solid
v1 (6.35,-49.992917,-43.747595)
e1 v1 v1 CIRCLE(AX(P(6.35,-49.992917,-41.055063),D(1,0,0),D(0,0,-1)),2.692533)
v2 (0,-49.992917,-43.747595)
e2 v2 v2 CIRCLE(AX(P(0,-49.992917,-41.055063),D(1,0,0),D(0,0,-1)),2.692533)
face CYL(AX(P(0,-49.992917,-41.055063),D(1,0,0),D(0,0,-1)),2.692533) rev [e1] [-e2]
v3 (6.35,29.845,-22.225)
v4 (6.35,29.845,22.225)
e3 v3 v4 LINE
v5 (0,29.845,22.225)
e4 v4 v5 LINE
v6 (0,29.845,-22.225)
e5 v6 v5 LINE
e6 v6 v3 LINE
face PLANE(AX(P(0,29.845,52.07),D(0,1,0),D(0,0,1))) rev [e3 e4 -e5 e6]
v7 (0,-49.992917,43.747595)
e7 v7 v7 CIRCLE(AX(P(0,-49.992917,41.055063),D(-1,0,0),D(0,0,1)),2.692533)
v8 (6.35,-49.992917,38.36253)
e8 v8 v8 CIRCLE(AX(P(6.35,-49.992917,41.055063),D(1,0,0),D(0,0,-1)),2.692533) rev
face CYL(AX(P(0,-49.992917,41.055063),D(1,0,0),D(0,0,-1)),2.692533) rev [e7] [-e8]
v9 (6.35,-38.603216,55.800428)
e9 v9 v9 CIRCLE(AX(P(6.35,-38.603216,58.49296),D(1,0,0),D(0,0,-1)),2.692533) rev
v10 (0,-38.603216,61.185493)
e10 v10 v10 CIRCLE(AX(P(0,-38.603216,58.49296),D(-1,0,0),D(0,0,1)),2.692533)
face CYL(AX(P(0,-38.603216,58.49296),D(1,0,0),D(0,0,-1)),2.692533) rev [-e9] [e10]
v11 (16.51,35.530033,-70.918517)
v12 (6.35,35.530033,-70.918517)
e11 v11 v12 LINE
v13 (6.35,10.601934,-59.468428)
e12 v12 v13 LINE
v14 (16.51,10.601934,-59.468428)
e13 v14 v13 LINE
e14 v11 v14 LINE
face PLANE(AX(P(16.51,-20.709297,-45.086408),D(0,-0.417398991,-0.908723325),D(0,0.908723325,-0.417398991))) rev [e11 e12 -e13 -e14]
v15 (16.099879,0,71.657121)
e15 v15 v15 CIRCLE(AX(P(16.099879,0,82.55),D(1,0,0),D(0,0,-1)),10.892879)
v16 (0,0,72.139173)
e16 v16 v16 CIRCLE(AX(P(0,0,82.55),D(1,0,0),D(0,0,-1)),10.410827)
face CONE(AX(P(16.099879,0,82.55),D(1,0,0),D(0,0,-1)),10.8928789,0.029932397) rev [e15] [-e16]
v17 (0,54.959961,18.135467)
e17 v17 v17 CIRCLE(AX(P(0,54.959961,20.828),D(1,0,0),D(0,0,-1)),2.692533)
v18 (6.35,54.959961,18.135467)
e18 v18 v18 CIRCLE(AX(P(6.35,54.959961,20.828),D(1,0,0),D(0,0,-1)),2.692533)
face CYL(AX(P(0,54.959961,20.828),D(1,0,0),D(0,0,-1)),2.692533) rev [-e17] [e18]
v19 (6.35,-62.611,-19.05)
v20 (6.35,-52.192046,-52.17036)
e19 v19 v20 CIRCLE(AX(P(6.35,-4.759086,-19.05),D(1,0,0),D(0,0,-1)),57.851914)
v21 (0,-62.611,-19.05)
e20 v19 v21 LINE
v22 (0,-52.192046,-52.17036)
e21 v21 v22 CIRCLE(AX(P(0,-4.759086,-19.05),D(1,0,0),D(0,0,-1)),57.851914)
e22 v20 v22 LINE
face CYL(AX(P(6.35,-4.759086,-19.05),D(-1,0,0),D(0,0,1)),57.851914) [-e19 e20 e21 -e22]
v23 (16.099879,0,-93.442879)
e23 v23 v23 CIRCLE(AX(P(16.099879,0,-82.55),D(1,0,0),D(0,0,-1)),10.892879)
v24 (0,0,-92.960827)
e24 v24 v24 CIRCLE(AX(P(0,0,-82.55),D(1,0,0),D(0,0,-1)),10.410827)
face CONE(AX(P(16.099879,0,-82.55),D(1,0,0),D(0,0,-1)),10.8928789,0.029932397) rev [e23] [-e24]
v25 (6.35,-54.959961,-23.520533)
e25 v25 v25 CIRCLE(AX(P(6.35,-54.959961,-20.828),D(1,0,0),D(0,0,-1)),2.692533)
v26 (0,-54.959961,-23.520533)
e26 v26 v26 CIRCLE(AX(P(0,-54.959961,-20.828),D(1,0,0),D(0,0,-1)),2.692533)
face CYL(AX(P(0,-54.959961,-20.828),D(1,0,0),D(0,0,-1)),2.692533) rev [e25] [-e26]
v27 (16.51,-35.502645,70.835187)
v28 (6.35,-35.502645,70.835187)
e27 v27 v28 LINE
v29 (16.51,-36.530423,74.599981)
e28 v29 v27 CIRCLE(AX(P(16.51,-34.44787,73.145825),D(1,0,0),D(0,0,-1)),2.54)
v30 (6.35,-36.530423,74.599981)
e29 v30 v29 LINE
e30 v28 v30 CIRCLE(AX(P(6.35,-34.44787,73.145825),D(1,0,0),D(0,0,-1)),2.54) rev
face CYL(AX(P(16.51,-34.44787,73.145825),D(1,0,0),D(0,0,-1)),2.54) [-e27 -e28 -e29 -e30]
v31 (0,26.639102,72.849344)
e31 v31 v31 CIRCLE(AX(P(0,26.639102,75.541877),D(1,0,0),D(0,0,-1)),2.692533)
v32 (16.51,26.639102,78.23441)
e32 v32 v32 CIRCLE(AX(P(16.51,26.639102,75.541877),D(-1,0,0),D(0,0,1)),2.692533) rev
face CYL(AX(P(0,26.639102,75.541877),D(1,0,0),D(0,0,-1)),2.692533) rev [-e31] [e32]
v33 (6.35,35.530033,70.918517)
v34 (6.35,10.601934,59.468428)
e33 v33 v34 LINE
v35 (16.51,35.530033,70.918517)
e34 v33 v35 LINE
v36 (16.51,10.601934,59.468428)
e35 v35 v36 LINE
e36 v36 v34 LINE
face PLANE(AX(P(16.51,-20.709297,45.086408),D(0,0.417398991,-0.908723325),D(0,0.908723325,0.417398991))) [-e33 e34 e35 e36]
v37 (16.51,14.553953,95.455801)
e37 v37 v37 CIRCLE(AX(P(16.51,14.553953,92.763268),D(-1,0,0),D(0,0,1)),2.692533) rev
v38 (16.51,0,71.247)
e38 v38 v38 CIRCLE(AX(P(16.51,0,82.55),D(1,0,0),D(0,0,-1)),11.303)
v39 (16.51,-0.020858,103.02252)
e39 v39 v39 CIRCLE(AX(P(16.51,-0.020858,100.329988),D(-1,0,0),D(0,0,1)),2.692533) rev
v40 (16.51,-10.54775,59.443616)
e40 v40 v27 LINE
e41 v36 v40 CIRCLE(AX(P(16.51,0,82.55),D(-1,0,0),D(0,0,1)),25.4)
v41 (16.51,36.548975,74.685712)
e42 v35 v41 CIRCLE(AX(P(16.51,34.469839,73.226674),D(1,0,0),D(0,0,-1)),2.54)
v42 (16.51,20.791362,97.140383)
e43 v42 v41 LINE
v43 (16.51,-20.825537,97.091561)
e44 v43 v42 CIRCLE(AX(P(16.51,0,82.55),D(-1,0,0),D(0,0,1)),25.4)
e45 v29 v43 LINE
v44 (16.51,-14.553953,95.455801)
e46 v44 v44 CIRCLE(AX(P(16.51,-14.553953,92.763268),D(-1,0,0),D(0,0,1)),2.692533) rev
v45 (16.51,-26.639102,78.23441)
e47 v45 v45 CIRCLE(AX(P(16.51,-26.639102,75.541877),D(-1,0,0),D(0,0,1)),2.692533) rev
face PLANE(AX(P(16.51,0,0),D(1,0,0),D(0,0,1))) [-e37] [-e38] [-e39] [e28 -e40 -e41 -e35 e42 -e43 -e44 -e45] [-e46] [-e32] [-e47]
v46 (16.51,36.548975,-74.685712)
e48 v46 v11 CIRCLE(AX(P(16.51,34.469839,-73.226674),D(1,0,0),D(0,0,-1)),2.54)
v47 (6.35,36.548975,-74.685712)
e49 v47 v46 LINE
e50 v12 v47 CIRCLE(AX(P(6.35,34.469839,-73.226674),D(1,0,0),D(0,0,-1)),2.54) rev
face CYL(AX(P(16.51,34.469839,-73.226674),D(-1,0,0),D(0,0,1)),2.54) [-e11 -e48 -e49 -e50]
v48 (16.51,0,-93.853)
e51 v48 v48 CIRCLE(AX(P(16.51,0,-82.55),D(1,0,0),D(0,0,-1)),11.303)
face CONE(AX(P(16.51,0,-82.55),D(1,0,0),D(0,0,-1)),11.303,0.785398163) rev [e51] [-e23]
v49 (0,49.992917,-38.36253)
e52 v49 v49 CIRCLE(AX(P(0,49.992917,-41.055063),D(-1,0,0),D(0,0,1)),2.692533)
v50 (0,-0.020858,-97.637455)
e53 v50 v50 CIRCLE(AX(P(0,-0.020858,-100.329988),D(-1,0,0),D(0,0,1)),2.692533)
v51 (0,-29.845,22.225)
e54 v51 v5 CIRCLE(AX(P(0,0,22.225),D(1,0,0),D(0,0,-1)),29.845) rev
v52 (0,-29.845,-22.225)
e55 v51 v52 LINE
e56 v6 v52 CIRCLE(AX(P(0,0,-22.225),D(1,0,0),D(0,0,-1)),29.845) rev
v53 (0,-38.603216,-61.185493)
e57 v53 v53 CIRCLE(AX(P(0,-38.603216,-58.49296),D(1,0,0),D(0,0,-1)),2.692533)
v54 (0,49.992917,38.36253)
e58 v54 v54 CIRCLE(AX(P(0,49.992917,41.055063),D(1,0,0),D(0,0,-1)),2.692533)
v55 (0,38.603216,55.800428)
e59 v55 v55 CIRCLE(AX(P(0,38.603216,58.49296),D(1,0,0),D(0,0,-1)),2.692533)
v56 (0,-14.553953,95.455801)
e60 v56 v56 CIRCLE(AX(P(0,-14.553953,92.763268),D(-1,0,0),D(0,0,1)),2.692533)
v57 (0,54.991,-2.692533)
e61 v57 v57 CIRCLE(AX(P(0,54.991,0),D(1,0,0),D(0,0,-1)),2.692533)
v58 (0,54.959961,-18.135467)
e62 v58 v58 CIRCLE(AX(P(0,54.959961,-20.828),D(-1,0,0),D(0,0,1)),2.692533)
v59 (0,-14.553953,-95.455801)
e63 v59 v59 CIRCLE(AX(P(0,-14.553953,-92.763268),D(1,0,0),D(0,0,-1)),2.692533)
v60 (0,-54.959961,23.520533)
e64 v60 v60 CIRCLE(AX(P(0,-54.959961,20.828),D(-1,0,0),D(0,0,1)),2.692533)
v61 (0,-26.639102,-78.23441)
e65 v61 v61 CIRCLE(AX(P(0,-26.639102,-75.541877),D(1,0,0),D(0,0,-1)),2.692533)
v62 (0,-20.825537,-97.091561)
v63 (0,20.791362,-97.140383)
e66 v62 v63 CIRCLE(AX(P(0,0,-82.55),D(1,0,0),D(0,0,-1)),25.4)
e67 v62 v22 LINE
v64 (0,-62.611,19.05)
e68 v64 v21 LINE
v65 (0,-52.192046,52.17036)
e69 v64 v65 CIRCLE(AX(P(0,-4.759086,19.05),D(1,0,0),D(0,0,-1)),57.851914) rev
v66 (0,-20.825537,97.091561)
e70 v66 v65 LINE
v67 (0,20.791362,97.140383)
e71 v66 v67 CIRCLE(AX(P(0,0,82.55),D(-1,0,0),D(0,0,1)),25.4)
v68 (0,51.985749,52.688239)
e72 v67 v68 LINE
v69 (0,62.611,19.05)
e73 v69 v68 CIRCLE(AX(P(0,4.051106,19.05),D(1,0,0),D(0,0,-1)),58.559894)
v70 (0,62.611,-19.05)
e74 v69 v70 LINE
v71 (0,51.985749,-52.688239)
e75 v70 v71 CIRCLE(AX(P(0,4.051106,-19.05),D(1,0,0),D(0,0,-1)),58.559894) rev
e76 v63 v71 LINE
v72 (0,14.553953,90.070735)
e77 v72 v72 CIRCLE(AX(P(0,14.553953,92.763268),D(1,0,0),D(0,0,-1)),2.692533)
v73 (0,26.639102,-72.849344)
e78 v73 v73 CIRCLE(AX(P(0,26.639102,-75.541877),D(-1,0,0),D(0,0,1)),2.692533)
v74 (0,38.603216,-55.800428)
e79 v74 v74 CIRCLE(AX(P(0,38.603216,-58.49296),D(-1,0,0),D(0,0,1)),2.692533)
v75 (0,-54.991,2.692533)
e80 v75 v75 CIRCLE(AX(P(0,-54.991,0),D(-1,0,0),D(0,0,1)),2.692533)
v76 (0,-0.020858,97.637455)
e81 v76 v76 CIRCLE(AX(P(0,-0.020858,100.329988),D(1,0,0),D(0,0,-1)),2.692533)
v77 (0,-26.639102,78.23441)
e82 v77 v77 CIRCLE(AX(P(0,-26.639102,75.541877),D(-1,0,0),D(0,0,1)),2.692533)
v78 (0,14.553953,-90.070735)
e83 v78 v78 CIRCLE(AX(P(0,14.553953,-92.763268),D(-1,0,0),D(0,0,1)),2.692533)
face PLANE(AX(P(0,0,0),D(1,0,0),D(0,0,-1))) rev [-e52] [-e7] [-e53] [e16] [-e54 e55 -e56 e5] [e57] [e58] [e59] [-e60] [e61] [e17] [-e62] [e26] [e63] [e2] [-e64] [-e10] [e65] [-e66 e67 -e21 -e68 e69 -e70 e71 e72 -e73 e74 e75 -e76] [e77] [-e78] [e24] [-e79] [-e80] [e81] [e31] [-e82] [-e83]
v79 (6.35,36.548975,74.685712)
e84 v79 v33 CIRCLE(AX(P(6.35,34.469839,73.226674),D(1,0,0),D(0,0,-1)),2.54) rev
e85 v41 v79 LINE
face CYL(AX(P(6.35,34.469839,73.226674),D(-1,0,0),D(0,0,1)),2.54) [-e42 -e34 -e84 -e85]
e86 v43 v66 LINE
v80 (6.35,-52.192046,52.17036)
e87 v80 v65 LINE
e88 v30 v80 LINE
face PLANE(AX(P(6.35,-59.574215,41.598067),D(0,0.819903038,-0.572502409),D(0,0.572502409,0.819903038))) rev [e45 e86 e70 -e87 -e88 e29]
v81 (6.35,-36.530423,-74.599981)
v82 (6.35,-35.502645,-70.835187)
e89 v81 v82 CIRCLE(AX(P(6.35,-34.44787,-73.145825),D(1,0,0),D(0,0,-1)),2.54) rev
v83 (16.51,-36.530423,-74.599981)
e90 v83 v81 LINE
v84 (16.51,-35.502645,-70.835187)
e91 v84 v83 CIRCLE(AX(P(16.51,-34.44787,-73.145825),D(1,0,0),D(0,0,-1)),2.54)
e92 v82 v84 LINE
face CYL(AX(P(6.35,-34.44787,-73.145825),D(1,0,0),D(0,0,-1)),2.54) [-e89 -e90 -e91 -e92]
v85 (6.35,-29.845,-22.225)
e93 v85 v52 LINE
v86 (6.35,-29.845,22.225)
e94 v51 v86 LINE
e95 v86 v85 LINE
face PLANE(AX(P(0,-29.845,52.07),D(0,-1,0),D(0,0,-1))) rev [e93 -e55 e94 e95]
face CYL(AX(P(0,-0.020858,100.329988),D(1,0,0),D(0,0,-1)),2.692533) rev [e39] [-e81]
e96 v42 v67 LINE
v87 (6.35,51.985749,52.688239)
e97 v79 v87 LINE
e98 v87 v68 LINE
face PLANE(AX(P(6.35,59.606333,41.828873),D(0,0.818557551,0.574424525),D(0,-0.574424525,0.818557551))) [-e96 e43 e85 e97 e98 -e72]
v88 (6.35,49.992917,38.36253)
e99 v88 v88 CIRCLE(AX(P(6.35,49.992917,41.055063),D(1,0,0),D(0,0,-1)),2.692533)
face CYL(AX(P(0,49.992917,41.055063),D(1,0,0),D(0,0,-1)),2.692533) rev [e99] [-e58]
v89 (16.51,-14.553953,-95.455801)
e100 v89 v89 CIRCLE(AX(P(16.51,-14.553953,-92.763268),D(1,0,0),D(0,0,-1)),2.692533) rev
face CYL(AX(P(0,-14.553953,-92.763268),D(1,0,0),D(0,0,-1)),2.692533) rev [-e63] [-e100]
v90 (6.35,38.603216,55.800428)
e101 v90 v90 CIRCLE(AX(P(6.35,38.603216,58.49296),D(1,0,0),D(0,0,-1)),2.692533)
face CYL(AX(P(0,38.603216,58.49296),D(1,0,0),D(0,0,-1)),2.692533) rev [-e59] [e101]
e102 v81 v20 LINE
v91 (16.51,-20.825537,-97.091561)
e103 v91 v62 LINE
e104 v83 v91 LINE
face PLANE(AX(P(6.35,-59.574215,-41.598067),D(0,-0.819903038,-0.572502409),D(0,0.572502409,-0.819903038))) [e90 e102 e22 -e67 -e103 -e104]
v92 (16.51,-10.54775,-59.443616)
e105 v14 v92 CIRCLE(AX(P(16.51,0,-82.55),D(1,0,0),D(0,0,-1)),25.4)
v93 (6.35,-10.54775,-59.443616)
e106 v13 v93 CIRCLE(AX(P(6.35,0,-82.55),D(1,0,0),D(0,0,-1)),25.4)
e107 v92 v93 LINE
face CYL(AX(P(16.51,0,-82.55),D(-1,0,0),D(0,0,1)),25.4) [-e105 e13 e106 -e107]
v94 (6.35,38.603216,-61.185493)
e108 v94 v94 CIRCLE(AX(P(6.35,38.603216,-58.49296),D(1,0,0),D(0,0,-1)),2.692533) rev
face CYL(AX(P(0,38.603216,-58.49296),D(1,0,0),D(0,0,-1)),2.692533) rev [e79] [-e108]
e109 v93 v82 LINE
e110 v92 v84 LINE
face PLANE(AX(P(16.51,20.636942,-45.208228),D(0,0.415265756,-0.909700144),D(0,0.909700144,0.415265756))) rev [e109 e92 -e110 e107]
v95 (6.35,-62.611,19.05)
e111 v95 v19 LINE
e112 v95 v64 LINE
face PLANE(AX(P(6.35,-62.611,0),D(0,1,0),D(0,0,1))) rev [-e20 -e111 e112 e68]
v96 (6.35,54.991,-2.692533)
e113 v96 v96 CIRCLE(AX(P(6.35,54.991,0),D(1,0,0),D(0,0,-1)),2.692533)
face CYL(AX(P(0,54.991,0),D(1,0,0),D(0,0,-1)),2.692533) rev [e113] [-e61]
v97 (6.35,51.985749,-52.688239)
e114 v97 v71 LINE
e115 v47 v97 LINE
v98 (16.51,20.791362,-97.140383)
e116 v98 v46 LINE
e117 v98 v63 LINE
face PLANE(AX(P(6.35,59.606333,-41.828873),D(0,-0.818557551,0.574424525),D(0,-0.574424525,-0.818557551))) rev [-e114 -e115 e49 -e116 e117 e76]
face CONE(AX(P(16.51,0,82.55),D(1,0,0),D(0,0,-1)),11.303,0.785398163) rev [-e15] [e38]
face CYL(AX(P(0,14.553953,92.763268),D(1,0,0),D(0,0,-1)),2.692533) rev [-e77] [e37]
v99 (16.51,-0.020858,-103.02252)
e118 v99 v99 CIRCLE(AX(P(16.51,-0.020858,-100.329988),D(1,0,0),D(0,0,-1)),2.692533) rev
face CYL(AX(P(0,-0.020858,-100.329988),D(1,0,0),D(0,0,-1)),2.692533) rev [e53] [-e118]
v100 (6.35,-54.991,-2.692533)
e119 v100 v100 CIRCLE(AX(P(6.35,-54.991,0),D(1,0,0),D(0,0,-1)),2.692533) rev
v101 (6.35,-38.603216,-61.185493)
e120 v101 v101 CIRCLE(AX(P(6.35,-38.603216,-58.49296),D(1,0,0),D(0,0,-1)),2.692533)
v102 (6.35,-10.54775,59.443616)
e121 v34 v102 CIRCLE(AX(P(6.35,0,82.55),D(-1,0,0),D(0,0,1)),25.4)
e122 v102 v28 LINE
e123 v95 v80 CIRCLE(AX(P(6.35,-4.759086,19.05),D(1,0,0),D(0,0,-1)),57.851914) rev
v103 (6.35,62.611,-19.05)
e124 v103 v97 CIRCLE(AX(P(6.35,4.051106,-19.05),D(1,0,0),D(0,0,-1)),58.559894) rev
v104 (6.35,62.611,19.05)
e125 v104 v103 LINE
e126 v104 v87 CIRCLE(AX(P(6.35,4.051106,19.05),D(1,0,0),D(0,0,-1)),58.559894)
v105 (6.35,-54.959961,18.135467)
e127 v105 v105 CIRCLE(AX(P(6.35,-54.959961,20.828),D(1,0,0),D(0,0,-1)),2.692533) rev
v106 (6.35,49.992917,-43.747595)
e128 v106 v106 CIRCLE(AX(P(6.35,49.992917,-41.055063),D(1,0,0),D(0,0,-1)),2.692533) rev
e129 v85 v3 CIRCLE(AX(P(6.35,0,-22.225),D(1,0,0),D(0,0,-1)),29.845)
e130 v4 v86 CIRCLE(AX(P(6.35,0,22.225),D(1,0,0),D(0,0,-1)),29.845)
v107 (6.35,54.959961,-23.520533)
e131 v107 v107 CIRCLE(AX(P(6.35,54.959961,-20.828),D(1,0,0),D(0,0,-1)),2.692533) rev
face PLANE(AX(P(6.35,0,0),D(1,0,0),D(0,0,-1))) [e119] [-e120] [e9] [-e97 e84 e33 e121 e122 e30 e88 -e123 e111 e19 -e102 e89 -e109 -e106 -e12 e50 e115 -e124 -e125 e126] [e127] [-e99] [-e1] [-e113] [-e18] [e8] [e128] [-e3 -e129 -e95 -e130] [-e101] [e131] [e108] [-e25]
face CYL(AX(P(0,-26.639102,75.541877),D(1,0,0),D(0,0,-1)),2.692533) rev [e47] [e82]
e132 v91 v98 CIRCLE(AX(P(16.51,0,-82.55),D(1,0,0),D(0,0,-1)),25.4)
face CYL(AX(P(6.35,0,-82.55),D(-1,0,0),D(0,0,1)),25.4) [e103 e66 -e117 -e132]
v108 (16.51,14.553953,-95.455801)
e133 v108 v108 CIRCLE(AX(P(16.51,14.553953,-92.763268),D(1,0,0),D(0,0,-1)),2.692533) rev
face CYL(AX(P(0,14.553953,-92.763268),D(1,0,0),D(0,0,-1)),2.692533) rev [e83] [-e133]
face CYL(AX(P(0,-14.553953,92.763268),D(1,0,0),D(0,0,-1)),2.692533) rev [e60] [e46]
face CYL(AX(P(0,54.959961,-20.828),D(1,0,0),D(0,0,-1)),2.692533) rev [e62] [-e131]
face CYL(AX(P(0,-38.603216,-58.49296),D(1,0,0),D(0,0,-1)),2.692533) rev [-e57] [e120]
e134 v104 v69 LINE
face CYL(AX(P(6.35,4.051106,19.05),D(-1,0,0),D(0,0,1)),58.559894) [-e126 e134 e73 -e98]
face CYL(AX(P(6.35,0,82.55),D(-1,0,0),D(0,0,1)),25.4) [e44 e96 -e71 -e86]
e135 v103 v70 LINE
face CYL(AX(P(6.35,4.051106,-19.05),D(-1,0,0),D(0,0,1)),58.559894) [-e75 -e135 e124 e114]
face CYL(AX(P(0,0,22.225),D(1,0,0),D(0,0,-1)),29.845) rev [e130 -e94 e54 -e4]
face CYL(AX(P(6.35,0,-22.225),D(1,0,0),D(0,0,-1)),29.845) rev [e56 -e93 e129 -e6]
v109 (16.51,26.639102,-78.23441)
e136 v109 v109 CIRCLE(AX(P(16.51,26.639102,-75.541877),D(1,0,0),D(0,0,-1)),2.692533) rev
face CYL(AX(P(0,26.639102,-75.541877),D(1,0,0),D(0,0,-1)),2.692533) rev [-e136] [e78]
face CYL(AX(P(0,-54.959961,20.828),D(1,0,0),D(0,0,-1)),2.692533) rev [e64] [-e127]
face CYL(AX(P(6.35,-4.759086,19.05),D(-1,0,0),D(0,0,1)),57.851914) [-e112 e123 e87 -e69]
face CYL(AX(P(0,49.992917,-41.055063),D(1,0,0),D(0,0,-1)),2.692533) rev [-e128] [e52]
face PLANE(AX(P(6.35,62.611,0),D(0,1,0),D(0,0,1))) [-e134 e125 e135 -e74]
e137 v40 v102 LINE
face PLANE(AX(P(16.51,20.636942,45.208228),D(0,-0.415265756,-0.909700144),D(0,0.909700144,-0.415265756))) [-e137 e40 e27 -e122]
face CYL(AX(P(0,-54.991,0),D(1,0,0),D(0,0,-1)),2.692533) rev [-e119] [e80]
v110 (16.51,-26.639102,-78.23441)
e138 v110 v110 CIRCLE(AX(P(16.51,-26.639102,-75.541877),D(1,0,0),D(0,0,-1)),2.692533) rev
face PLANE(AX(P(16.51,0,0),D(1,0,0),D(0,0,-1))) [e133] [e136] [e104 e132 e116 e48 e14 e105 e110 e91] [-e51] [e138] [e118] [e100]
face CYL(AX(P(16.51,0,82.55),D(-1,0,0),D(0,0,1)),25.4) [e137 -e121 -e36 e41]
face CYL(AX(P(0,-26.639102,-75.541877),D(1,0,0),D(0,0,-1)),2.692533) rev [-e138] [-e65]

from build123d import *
from build123d.topology import SkipClean

# Parameters (mm, degrees)
BOSS_EXTRUDE1_DEPTH    = 6.35
CUT_EXTRUDE3_START     = -6.35
CUT_EXTRUDE3_OUTLINE_R = 2.69253261
CUT_EXTRUDE3_DEPTH     = 6.35
SKETCH5_W              = 104.14
SKETCH5_H              = 59.69
CUT_EXTRUDE4_DEPTH     = 6.35
FILLET1_R              = 29.845
FILLET2_R              = 29.845
SKETCH14_R             = 2.69253261
BOSS_EXTRUDE3_DEPTH    = 10.16
FILLET3_R              = 2.54
FILLET3_OF_MIRROR1_R   = 2.54


# Read off the part's stored shape, not the designer's step: Cut-Extrude3
# Some blends are built 0.0001 mm under size
with BuildPart() as part:
    # Sketch1 → Boss-Extrude1 (new body)
    with BuildSketch(Plane(origin=(0, 0, 0), x_dir=(0, 0, -1), z_dir=(1, 0, 0))):
        with BuildLine():
            Line((19.05, 62.611), (-19.05, 62.611))
            ThreePointArc((-19.05, 62.611), (-36.688219036, 59.891543079), (-52.688239169, 51.985749479))
            Line((-52.688239169, 51.985749479), (-97.140382944, 20.791361801))
            ThreePointArc((-97.140382944, 20.791361801), (-107.949982522, -0.029797308), (-97.091561196, -20.82553716))
            Line((-97.091561196, -20.82553716), (-52.170359894, -52.19204611))
            ThreePointArc((-52.170359894, -52.19204611), (-36.41024798, -59.944824567), (-19.05, -62.611))
            Line((-19.05, -62.611), (19.05, -62.611))
            ThreePointArc((19.05, -62.611), (36.41024798, -59.944824567), (52.170359894, -52.19204611))
            Line((52.170359894, -52.19204611), (97.091561196, -20.82553716))
            ThreePointArc((97.091561196, -20.82553716), (107.949982522, -0.029797308), (97.140382944, 20.791361801))
            Line((97.140382944, 20.791361801), (52.688239169, 51.985749479))
            ThreePointArc((52.688239169, 51.985749479), (36.688219036, 59.891543079), (19.05, 62.611))
        make_face()
    extrude(amount=BOSS_EXTRUDE1_DEPTH)

    # Cut-Extrude3 outline → Cut-Extrude3 (cut)
    with BuildSketch(Plane(origin=(6.35, 0, 0), x_dir=(0, 0, -1), z_dir=(1, 0, 0)).offset(CUT_EXTRUDE3_START)):
        with Locations((0, 54.991)):
            Circle(CUT_EXTRUDE3_OUTLINE_R)
        with Locations((20.828, 54.959960993)):
            Circle(CUT_EXTRUDE3_OUTLINE_R)
        with Locations((41.055062572, 49.992917233)):
            Circle(CUT_EXTRUDE3_OUTLINE_R)
        with Locations((58.492960359, 38.603215535)):
            Circle(CUT_EXTRUDE3_OUTLINE_R)
        with Locations((75.541877036, 26.639101521)):
            Circle(CUT_EXTRUDE3_OUTLINE_R)
        with Locations((92.763268061, 14.553953261)):
            Circle(CUT_EXTRUDE3_OUTLINE_R)
        with Locations((100.329987765, -0.020858116)):
            Circle(CUT_EXTRUDE3_OUTLINE_R)
        with Locations((92.763268061, -14.553953261)):
            Circle(CUT_EXTRUDE3_OUTLINE_R)
        with Locations((-20.828, 54.959960993)):
            Circle(CUT_EXTRUDE3_OUTLINE_R)
        with Locations((-41.055062572, 49.992917233)):
            Circle(CUT_EXTRUDE3_OUTLINE_R)
        with Locations((-58.492960359, 38.603215535)):
            Circle(CUT_EXTRUDE3_OUTLINE_R)
        with Locations((-75.541877036, 26.639101521)):
            Circle(CUT_EXTRUDE3_OUTLINE_R)
        with Locations((-92.763268061, 14.553953261)):
            Circle(CUT_EXTRUDE3_OUTLINE_R)
        with Locations((-100.329987765, -0.020858116)):
            Circle(CUT_EXTRUDE3_OUTLINE_R)
        with Locations((-92.763268061, -14.553953261)):
            Circle(CUT_EXTRUDE3_OUTLINE_R)
        with Locations((-75.541877036, -26.639101521)):
            Circle(CUT_EXTRUDE3_OUTLINE_R)
        with Locations((-58.492960359, -38.603215535)):
            Circle(CUT_EXTRUDE3_OUTLINE_R)
        with Locations((-41.055062572, -49.992917233)):
            Circle(CUT_EXTRUDE3_OUTLINE_R)
        with Locations((-20.828, -54.959960993)):
            Circle(CUT_EXTRUDE3_OUTLINE_R)
        with Locations((0, -54.991)):
            Circle(CUT_EXTRUDE3_OUTLINE_R)
        with Locations((20.828, -54.959960993)):
            Circle(CUT_EXTRUDE3_OUTLINE_R)
        with Locations((41.055062572, -49.992917233)):
            Circle(CUT_EXTRUDE3_OUTLINE_R)
        with Locations((58.492960359, -38.603215535)):
            Circle(CUT_EXTRUDE3_OUTLINE_R)
        with Locations((75.541877036, -26.639101521)):
            Circle(CUT_EXTRUDE3_OUTLINE_R)
    extrude(amount=CUT_EXTRUDE3_DEPTH, mode=Mode.SUBTRACT)

    # Sketch5 → Cut-Extrude4 (cut)
    with BuildSketch(Plane(origin=(6.35, 0, 0), x_dir=(0, 0, -1), z_dir=(1, 0, 0))):
        Rectangle(SKETCH5_W, SKETCH5_H)
    extrude(amount=-CUT_EXTRUDE4_DEPTH, mode=Mode.SUBTRACT)

    # Fillet1
    fillet1_edges = [part.edges().sort_by_distance(p)[0] for p in [
        (3.175, -29.845, 52.07),
        (3.175, 29.845, 52.07),
    ]]
    fillet(fillet1_edges, radius=FILLET1_R - 0.0001)  # a hair under: the kernel refuses the full size

    # Fillet2
    fillet2_edges = [part.edges().sort_by_distance(p)[0] for p in [
        (3.175, 29.845, -52.07),
        (3.175, -29.845, -52.07),
    ]]
    fillet(fillet2_edges, radius=FILLET2_R - 0.0001)  # a hair under: the kernel refuses the full size

    # Sketch14 → Boss-Extrude3 (add)
    # profile 1 of 3: a face of its own
    with SkipClean():  # the faces are left unmerged after this step: merging them gives an invalid solid
        with BuildSketch(Plane(origin=(6.35, 0, 0), x_dir=(0, 0, -1), z_dir=(1, 0, 0))):
            with BuildLine():
                ThreePointArc((77.610004669, -24.914984369), (87.76808503, -24.858229797), (97.091561196, -20.82553716))
                ThreePointArc((97.091561196, -20.82553716), (105.072385024, -11.743175585), (107.95, 0))
                ThreePointArc((107.95, 0), (105.086145708, 11.716745991), (97.140382944, 20.791361801))
                ThreePointArc((97.140382944, 20.791361801), (87.797243185, 24.852091239), (77.610004669, 24.914984369))
                ThreePointArc((77.610004669, 24.914984369), (76.226910447, 24.03516967), (74.589917057, 24.120470135))
                ThreePointArc((74.589917057, 24.120470135), (65.621214015, 18.936108499), (59.468427534, 10.601934374))
                ThreePointArc((59.468427534, 10.601934374), (57.150017478, 0.029797308), (59.443616349, -10.547750213))
                ThreePointArc((59.443616349, -10.547750213), (65.599011292, -18.916235931), (74.589917057, -24.120470135))
                ThreePointArc((74.589917057, -24.120470135), (76.226910447, -24.03516967), (77.610004669, -24.914984369))
            make_face()
            with Locations((92.763268061, -14.553953261)):
                Circle(SKETCH14_R, mode=Mode.SUBTRACT)
            with Locations((100.329987765, -0.020858116)):
                Circle(SKETCH14_R, mode=Mode.SUBTRACT)
            with Locations((92.763268061, 14.553953261)):
                Circle(SKETCH14_R, mode=Mode.SUBTRACT)
        # profile 2 of 3: a face of its own
        with BuildSketch(Plane(origin=(6.35, 0, 0), x_dir=(0, 0, -1), z_dir=(1, 0, 0))):
            with BuildLine():
                ThreePointArc((77.610004669, 24.914984369), (87.797243185, 24.852091239), (97.140382944, 20.791361801))
                Line((97.140382944, 20.791361801), (72.190748783, 38.299821334))
                Line((72.190748783, 38.299821334), (59.468427534, 10.601934374))
                ThreePointArc((59.468427534, 10.601934374), (65.621214015, 18.936108499), (74.589917057, 24.120470135))
                ThreePointArc((74.589917057, 24.120470135), (74.011101322, 28.854154019), (78.234409646, 26.639101521))
                ThreePointArc((78.234409646, 26.639101521), (78.073500324, 25.722250725), (77.610004669, 24.914984369))
            make_face()
        # profile 3 of 3: a face of its own
        with BuildSketch(Plane(origin=(6.35, 0, 0), x_dir=(0, 0, -1), z_dir=(1, 0, 0))):
            with BuildLine():
                Line((72.100916604, -38.275410595), (97.091561196, -20.82553716))
                ThreePointArc((97.091561196, -20.82553716), (87.76808503, -24.858229797), (77.610004669, -24.914984369))
                ThreePointArc((77.610004669, -24.914984369), (78.073500324, -25.722250725), (78.234409646, -26.639101521))
                ThreePointArc((78.234409646, -26.639101521), (74.011101322, -28.854154019), (74.589917057, -24.120470135))
                ThreePointArc((74.589917057, -24.120470135), (65.599011292, -18.916235931), (59.443616349, -10.547750213))
                Line((59.443616349, -10.547750213), (72.100916604, -38.275410595))
            make_face()
        boss_extrude3 = extrude(amount=BOSS_EXTRUDE3_DEPTH)

    # Fillet3
    # the kernel refuses this fillet: 2.54 mm, written as the material it takes off along each edge
    with BuildSketch(Plane(origin=(6.35, -38.275410595, -72.100916604), x_dir=(0, 0.5725024092761827, -0.8199030377873753), z_dir=(1, 0, 0))) as fillet3_piece_1:
        with BuildLine():
            CenterArc((FILLET3_R * 1.2, FILLET3_R), FILLET3_R, 169.611142185, 100.388857815)
            Line((FILLET3_R * 0.216393442623, FILLET3_R * 1.18032786885), (0, 0))
            Line((0, 0), (FILLET3_R * 1.2, 0))
        make_face()
    extrude(amount=17.78, mode=Mode.SUBTRACT)
    with BuildSketch(Plane(origin=(6.35, 38.299821334, -72.190748783), x_dir=(0, -0.5744245253621356, -0.8185575512219561), z_dir=(1, 0, 0))) as fillet3_piece_2:
        with BuildLine():
            CenterArc((FILLET3_R * 1.2, -FILLET3_R), FILLET3_R, 90, 100.388857815)
            Line((FILLET3_R * 0.216393442623, -FILLET3_R * 1.18032786885), (0, 0))
            Line((0, 0), (FILLET3_R * 1.2, 0))
        make_face()
    extrude(amount=17.78, mode=Mode.SUBTRACT)

    # Sketch16 → 1/2 NPT Tapped Hole4 (revolve, cut)
    with SkipClean():  # the faces are left unmerged after this step: merging them gives an invalid solid
        with BuildSketch(Plane(origin=(16.51, 0, -82.55), x_dir=(0, 0, -1), z_dir=(0, 1, 0))):
            Polygon((0, 0), (0, 16.511), (8.9281, 16.511), (8.9281, 21.082), (10.273935163, 21.082), (10.8928789, 0.4101211), (11.303, 0), align=None)
        f_1_2_npt_tapped_hole4 = revolve(axis=Axis((22.86, 0, -82.55), (-1, 0, 0)), mode=Mode.SUBTRACT)

    # Mirror1: Boss-Extrude3, 1/2 NPT Tapped Hole4 across plane
    with SkipClean():  # the faces are left unmerged after this step: merging them gives an invalid solid
        add(boss_extrude3.mirror(Plane.XY))
        add(f_1_2_npt_tapped_hole4.mirror(Plane.XY), mode=Mode.SUBTRACT)

    # Fillet3 of Mirror1
    # the kernel refuses this fillet: 2.54 mm, written as the material it takes off along each edge
    with BuildSketch(Plane(origin=(6.35, -38.275410595, 72.100916604), x_dir=(0, 0.5725024092761827, 0.8199030377873753), z_dir=(1, 0, 0))) as fillet3_of_mirror1_piece_1:
        with BuildLine():
            CenterArc((FILLET3_OF_MIRROR1_R * 1.2, -FILLET3_OF_MIRROR1_R), FILLET3_OF_MIRROR1_R, 90, 100.388857815)
            Line((FILLET3_OF_MIRROR1_R * 0.216393442623, -FILLET3_OF_MIRROR1_R * 1.18032786885), (0, 0))
            Line((0, 0), (FILLET3_OF_MIRROR1_R * 1.2, 0))
        make_face()
    extrude(amount=17.78, mode=Mode.SUBTRACT)
    with BuildSketch(Plane(origin=(6.35, 38.299821334, 72.190748783), x_dir=(0, -0.5744245253621356, 0.8185575512219561), z_dir=(1, 0, 0))) as fillet3_of_mirror1_piece_2:
        with BuildLine():
            CenterArc((FILLET3_OF_MIRROR1_R * 1.2, FILLET3_OF_MIRROR1_R), FILLET3_OF_MIRROR1_R, 169.611142185, 100.388857815)
            Line((FILLET3_OF_MIRROR1_R * 0.216393442623, FILLET3_OF_MIRROR1_R * 1.18032786885), (0, 0))
            Line((0, 0), (FILLET3_OF_MIRROR1_R * 1.2, 0))
        make_face()
    extrude(amount=17.78, mode=Mode.SUBTRACT)


solid = part.part
